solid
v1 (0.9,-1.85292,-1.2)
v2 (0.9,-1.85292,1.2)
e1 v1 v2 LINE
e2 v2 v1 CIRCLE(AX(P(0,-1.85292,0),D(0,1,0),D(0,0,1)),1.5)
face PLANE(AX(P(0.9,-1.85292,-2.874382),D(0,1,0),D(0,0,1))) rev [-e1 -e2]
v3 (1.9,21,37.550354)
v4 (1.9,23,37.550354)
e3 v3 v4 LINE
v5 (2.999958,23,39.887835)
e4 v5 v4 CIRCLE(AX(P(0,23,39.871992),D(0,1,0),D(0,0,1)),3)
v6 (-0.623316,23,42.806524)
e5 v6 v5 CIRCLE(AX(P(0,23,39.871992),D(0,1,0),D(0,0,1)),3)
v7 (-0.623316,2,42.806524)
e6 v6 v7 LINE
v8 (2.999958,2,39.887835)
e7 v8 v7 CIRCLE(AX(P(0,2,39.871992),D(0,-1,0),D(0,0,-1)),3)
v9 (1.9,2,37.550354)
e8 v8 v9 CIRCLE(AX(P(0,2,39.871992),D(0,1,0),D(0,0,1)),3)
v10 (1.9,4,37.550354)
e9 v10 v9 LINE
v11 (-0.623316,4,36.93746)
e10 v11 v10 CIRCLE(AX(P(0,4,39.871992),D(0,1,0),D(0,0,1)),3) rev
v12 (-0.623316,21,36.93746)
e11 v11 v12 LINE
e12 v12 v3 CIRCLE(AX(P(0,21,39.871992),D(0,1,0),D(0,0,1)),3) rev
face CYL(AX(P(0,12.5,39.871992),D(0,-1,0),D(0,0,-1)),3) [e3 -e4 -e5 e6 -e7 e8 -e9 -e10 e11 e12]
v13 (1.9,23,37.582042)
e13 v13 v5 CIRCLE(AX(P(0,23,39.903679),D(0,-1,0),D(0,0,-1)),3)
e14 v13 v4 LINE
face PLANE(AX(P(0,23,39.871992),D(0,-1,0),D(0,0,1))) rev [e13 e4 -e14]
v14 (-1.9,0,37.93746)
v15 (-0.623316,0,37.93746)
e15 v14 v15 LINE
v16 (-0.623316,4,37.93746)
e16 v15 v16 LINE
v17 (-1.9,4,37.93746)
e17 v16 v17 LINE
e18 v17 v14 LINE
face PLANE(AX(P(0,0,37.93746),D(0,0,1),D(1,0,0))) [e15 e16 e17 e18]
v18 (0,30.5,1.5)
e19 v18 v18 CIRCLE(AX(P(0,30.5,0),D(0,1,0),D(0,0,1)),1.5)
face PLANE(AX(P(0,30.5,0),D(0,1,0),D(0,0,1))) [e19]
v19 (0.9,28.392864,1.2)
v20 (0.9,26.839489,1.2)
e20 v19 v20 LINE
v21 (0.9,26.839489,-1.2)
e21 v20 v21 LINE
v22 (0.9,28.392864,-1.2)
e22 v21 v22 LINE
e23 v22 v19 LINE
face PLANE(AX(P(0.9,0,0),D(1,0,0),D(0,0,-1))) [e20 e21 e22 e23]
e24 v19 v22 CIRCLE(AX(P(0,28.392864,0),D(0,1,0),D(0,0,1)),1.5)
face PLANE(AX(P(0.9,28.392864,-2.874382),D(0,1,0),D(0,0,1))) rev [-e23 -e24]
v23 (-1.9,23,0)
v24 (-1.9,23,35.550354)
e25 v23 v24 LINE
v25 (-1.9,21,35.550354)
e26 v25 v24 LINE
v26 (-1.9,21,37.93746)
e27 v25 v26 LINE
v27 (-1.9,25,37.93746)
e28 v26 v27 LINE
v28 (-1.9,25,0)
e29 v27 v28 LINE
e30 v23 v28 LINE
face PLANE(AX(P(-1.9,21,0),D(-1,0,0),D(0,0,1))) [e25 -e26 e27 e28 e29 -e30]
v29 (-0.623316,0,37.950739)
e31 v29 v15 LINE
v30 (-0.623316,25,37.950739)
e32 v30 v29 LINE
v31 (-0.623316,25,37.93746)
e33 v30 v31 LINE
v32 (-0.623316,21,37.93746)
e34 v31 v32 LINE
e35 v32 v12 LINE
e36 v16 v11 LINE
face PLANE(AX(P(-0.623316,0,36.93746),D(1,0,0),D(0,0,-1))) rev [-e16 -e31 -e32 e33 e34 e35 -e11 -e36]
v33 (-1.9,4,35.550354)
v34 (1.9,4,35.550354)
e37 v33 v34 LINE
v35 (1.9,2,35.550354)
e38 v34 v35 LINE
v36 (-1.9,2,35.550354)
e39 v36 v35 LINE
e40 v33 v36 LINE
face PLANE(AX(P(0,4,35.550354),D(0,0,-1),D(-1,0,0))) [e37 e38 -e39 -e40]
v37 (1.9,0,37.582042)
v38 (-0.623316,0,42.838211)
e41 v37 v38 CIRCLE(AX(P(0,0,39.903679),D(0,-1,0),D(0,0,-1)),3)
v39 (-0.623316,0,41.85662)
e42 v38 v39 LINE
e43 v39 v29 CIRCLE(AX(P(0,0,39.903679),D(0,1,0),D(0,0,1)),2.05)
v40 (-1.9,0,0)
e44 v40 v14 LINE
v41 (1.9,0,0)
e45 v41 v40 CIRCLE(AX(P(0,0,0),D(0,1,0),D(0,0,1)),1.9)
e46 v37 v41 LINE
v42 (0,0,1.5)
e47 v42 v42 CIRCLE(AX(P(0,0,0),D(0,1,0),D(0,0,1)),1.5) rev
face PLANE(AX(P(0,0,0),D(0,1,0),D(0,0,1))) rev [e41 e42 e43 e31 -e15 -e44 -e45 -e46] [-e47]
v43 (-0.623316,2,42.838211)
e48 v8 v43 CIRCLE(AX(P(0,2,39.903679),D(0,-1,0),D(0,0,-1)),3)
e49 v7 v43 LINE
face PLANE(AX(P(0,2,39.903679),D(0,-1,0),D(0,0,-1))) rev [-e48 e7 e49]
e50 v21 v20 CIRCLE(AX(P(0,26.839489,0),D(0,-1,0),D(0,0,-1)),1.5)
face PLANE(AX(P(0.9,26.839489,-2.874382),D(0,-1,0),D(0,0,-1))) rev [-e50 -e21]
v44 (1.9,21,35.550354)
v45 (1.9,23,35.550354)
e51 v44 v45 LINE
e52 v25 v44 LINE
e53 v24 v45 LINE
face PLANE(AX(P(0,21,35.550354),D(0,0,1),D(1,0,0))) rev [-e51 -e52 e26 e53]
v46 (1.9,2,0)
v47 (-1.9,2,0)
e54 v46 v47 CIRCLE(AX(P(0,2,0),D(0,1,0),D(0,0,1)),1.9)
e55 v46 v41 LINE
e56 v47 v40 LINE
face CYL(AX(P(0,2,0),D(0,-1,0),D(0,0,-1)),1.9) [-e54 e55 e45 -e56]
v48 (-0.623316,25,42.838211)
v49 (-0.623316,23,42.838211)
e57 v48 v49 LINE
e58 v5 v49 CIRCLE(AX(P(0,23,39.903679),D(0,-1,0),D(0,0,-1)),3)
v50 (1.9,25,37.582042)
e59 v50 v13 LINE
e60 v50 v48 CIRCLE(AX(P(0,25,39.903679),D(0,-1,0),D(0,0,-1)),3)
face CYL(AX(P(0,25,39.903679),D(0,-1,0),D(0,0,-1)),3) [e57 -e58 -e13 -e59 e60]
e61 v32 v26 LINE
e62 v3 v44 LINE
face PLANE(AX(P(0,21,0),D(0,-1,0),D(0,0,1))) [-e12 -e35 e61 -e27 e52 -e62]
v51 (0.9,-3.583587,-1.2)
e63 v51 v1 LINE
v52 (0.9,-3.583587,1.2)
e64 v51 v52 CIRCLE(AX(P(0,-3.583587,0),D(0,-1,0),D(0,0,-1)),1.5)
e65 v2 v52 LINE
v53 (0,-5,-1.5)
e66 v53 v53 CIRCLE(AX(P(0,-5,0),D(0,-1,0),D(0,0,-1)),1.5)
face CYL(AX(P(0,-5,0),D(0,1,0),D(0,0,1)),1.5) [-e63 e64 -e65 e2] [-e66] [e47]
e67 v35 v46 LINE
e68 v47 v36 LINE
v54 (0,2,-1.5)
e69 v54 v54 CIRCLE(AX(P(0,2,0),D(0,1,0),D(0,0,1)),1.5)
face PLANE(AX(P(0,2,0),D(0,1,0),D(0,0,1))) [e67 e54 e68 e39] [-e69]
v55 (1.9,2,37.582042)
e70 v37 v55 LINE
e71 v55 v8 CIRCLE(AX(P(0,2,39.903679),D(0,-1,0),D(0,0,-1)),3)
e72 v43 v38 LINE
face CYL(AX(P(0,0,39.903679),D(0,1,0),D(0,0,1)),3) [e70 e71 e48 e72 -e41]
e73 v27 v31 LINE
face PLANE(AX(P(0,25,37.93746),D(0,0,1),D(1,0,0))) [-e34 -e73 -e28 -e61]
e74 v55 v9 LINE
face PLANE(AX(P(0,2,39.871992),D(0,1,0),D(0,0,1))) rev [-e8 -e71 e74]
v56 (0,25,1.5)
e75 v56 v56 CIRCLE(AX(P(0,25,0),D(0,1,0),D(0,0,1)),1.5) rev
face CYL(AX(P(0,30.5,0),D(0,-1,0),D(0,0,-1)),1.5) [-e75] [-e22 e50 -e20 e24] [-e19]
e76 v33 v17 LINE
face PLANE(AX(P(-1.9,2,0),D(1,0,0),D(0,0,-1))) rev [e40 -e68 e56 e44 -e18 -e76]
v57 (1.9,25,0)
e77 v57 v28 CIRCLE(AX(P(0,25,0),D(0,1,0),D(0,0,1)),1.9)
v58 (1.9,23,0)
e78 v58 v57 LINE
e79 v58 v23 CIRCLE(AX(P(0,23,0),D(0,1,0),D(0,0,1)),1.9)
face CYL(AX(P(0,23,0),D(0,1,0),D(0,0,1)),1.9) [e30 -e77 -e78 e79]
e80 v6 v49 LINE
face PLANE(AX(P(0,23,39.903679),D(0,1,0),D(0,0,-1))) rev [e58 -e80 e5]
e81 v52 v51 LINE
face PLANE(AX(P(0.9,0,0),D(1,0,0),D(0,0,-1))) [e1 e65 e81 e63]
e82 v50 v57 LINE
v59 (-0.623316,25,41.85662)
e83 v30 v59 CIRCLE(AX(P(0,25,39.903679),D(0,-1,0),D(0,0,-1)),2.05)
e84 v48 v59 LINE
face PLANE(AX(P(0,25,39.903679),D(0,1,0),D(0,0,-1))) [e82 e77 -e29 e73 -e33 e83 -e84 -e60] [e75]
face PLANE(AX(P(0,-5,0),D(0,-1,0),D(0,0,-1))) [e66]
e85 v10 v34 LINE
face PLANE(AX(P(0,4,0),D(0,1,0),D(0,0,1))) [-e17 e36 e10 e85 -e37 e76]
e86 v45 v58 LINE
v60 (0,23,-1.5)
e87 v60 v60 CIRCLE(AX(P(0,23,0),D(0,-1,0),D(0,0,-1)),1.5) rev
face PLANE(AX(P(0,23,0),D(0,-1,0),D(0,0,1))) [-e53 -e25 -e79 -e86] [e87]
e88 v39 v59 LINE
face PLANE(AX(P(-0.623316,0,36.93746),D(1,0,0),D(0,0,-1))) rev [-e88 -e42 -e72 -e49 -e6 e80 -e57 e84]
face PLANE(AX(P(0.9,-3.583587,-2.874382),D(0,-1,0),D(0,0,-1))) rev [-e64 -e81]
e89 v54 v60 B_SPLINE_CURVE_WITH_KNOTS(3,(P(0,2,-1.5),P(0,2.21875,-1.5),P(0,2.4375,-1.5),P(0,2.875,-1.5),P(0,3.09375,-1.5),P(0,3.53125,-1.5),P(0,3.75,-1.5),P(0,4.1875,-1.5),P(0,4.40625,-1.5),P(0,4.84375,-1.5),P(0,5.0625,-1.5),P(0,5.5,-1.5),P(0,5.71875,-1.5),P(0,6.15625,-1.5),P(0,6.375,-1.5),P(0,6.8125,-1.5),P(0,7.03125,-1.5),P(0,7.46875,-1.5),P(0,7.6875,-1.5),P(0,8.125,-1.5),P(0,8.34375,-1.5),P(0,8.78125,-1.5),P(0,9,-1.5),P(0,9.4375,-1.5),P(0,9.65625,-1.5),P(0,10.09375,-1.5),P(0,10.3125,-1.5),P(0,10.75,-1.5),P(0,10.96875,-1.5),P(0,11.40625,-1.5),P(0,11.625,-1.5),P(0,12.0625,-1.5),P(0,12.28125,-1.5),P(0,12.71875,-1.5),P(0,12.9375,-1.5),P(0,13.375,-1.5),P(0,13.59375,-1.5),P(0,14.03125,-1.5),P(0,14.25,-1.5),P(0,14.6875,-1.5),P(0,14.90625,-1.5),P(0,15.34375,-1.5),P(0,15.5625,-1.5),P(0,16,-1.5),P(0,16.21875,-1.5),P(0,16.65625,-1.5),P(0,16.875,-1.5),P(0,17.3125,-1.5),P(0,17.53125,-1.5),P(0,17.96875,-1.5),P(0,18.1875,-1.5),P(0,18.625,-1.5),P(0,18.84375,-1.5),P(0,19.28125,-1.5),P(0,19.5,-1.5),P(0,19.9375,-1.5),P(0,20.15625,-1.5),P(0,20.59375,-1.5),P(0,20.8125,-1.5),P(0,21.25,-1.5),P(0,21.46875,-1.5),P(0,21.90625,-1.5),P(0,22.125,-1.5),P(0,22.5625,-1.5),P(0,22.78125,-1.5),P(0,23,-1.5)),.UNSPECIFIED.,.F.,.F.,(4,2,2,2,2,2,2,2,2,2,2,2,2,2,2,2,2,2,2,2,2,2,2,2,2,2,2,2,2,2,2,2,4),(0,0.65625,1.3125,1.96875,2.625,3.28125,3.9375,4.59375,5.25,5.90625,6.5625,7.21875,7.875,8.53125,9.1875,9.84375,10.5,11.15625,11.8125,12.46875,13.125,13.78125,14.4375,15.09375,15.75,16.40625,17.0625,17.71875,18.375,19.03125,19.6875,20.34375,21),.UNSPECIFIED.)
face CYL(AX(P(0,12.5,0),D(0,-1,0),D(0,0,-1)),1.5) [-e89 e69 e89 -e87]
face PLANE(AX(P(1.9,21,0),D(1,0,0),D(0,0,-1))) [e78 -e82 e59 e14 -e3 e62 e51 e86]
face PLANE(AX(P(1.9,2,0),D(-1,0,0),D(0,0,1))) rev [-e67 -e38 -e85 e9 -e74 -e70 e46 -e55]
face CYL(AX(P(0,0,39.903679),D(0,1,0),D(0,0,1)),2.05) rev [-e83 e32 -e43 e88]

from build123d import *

# Parameters (mm, degrees)
EXTRUDE_1_DEPTH     = 2
SKETCH_2_R          = 3
EXTRUDE_2_DEPTH     = 10.5
SKETCH_3_R          = 2.05
CUT_EXTRUDE_1_DEPTH = 12.5
EXTRUDE_3_DEPTH     = 2
SKETCH_5_R          = 3
SKETCH_5_R_2        = 2.05
EXTRUDE_4_DEPTH     = 2
SKETCH_8_W          = 2.95616439
SKETCH_8_H          = 6.387063899
CUT_EXTRUDE_3_DEPTH = 12.5
SKETCH_9_W          = 1.27668382
SKETCH_9_H          = 4
EXTRUDE_5_DEPTH     = 1
SKETCH_10_R         = 1.5
EXTRUDE_6_DEPTH     = 10.5
MIRROR_START        = 23
MIRROR_11_DEPTH     = 2
SKETCH_11_R         = 1.5
EXTRUDE_7_DEPTH     = 18
EXTRUDE_START       = 5
SKETCH_12_R         = 1.5
EXTRUDE_8_DEPTH     = 5
SKETCH_13_W         = 5.222026014
SKETCH_13_H         = 1.730667712
SKETCH_13_H_2       = 1.553374839
CUT_EXTRUDE_4_DEPTH = 1


# Read off the part's stored shape, not the designer's step: 镜向11
with BuildPart() as part:
    # 草图1 → 凸台-拉伸1 (new body)
    with BuildSketch(Plane(origin=(0, 0, 0), x_dir=(1, 0, 0), z_dir=(0, 1, 0))):
        with BuildLine():
            Line((1.9, 0), (1.9, -40.018240839))
            ThreePointArc((1.9, -40.018240839), (0, -41.918240839), (-1.9, -40.018240839))
            Line((-1.9, -40.018240839), (-1.9, 0))
            ThreePointArc((-1.9, 0), (0, 1.9), (1.9, 0))
        make_face()
    extrude(amount=EXTRUDE_1_DEPTH)

    # 草图2 → 凸台-拉伸2 (add)
    with BuildSketch(Plane(origin=(0, 2, 0), x_dir=(1, 0, 0), z_dir=(0, 1, 0))):
        with Locations(Location((0, -39.871991717, 0), (0, 0, 129.296480239))):
            Circle(SKETCH_2_R)
    extrude_2 = extrude(amount=EXTRUDE_2_DEPTH)

    # 草图3 → 切除-拉伸1 (cut)
    with BuildSketch(Plane(origin=(0, 12.5, 0), x_dir=(1, 0, 0), z_dir=(0, 1, 0))):
        with Locations(Location((0, -39.903679128, 0), (0, 0, 270))):
            Circle(SKETCH_3_R)
    cut_extrude_1 = extrude(amount=-CUT_EXTRUDE_1_DEPTH, mode=Mode.SUBTRACT)

    # 草图4 → 凸台-拉伸3 (add)
    with BuildSketch(Plane(origin=(0, 2, 0), x_dir=(1, 0, 0), z_dir=(0, 1, 0))):
        with BuildLine():
            Line((-1.9, -35.550354364), (-1.9, -37.550354364))
            ThreePointArc((-1.9, -37.550354364), (-1.008733845, -37.046667659), (0, -36.871991717))
            ThreePointArc((0, -36.871991717), (1.008733845, -37.046667659), (1.9, -37.550354364))
            Line((1.9, -37.550354364), (1.9, -35.550354364))
            Line((1.9, -35.550354364), (-1.9, -35.550354364))
        make_face()
    extrude_3 = extrude(amount=EXTRUDE_3_DEPTH)

    # 草图5 → 凸台-拉伸4 (add)
    with BuildSketch(Plane.XZ.offset(-2)):
        with Locations((0, 39.903679128)):
            Circle(SKETCH_5_R)
        with Locations(Location((0, 39.903679128, 0), (0, 0, 90))):
            Circle(SKETCH_5_R_2, mode=Mode.SUBTRACT)
    extrude_4 = extrude(amount=EXTRUDE_4_DEPTH)

    # 草图8 → 切除-拉伸3 (cut)
    with BuildSketch(Plane(origin=(0, 12.5, 0), x_dir=(1, 0, 0), z_dir=(0, 1, 0))):
        with Locations((-2.101398375, -40.130991858)):
            Rectangle(SKETCH_8_W, SKETCH_8_H)
    cut_extrude_3 = extrude(amount=-CUT_EXTRUDE_3_DEPTH, mode=Mode.SUBTRACT)

    # 草图9 → 凸台-拉伸5 (add)
    with BuildSketch(Plane.XY.offset(36.937459908)):
        with Locations((-1.26165809, 2)):
            Rectangle(SKETCH_9_W, SKETCH_9_H)
    extrude_5 = extrude(amount=EXTRUDE_5_DEPTH)

    # 草图10 → 凸台-拉伸6 (add)
    with BuildSketch(Plane(origin=(0, 2, 0), x_dir=(1, 0, 0), z_dir=(0, 1, 0))):
        with Locations(Location((0, 0, 0), (0, 0, 90))):
            Circle(SKETCH_10_R)
    extrude(amount=EXTRUDE_6_DEPTH)

    # 镜向10: 凸台-拉伸2, 切除-拉伸1, 凸台-拉伸3, 凸台-拉伸4, 切除-拉伸3, 凸台-拉伸5 across plane
    add(extrude_2.mirror(Plane.ZX.offset(12.5)))
    add(cut_extrude_1.mirror(Plane.ZX.offset(12.5)), mode=Mode.SUBTRACT)
    add(extrude_3.mirror(Plane.ZX.offset(12.5)))
    add(extrude_4.mirror(Plane.ZX.offset(12.5)))
    add(cut_extrude_3.mirror(Plane.ZX.offset(12.5)), mode=Mode.SUBTRACT)
    add(extrude_5.mirror(Plane.ZX.offset(12.5)))

    # 镜向11 outline → 镜向11 (add)
    with BuildSketch(Plane(origin=(0, 0, 0), x_dir=(1, 0, 0), z_dir=(0, 1, 0)).offset(MIRROR_START)):
        with BuildLine():
            ThreePointArc((1.9, 0), (0, 1.9), (-1.9, 0))
            Line((-1.9, 0), (-1.9, -36.937459908))
            Line((-1.9, -36.937459908), (-0.62331618, -36.937459908))
            Line((-0.62331618, -36.937459908), (-0.62331618, -36.969147319))
            ThreePointArc((-0.62331618, -36.969147319), (0.708089188, -36.988441625), (1.9, -37.582041775))
            Line((1.9, -37.582041775), (1.9, 0))
        make_face()
    extrude(amount=MIRROR_11_DEPTH)

    # 草图11 → 凸台-拉伸7 (add)
    with BuildSketch(Plane(origin=(0, 12.5, 0), x_dir=(1, 0, 0), z_dir=(0, 1, 0))):
        with Locations(Location((0, 0, 0), (0, 0, 90))):
            Circle(SKETCH_11_R)
    extrude(amount=EXTRUDE_7_DEPTH)

    # 草图12 → 凸台-拉伸8 (add)
    with BuildSketch(Plane.XZ.offset(EXTRUDE_START)):
        with Locations(Location((0, 0, 0), (0, 0, 270))):
            Circle(SKETCH_12_R)
    extrude(amount=-EXTRUDE_8_DEPTH)

    # 草图13 → 切除-拉伸4 (cut)
    with BuildSketch(Plane(origin=(1.9, 0, 0), x_dir=(0, 0, -1), z_dir=(1, 0, 0))):
        with Locations((0.263368909, -2.718253364)):
            Rectangle(SKETCH_13_W, SKETCH_13_H)
        with Locations((0.263368909, 27.61617656)):
            Rectangle(SKETCH_13_W, SKETCH_13_H_2)
    extrude(amount=-CUT_EXTRUDE_4_DEPTH, mode=Mode.SUBTRACT)


solid = part.part
